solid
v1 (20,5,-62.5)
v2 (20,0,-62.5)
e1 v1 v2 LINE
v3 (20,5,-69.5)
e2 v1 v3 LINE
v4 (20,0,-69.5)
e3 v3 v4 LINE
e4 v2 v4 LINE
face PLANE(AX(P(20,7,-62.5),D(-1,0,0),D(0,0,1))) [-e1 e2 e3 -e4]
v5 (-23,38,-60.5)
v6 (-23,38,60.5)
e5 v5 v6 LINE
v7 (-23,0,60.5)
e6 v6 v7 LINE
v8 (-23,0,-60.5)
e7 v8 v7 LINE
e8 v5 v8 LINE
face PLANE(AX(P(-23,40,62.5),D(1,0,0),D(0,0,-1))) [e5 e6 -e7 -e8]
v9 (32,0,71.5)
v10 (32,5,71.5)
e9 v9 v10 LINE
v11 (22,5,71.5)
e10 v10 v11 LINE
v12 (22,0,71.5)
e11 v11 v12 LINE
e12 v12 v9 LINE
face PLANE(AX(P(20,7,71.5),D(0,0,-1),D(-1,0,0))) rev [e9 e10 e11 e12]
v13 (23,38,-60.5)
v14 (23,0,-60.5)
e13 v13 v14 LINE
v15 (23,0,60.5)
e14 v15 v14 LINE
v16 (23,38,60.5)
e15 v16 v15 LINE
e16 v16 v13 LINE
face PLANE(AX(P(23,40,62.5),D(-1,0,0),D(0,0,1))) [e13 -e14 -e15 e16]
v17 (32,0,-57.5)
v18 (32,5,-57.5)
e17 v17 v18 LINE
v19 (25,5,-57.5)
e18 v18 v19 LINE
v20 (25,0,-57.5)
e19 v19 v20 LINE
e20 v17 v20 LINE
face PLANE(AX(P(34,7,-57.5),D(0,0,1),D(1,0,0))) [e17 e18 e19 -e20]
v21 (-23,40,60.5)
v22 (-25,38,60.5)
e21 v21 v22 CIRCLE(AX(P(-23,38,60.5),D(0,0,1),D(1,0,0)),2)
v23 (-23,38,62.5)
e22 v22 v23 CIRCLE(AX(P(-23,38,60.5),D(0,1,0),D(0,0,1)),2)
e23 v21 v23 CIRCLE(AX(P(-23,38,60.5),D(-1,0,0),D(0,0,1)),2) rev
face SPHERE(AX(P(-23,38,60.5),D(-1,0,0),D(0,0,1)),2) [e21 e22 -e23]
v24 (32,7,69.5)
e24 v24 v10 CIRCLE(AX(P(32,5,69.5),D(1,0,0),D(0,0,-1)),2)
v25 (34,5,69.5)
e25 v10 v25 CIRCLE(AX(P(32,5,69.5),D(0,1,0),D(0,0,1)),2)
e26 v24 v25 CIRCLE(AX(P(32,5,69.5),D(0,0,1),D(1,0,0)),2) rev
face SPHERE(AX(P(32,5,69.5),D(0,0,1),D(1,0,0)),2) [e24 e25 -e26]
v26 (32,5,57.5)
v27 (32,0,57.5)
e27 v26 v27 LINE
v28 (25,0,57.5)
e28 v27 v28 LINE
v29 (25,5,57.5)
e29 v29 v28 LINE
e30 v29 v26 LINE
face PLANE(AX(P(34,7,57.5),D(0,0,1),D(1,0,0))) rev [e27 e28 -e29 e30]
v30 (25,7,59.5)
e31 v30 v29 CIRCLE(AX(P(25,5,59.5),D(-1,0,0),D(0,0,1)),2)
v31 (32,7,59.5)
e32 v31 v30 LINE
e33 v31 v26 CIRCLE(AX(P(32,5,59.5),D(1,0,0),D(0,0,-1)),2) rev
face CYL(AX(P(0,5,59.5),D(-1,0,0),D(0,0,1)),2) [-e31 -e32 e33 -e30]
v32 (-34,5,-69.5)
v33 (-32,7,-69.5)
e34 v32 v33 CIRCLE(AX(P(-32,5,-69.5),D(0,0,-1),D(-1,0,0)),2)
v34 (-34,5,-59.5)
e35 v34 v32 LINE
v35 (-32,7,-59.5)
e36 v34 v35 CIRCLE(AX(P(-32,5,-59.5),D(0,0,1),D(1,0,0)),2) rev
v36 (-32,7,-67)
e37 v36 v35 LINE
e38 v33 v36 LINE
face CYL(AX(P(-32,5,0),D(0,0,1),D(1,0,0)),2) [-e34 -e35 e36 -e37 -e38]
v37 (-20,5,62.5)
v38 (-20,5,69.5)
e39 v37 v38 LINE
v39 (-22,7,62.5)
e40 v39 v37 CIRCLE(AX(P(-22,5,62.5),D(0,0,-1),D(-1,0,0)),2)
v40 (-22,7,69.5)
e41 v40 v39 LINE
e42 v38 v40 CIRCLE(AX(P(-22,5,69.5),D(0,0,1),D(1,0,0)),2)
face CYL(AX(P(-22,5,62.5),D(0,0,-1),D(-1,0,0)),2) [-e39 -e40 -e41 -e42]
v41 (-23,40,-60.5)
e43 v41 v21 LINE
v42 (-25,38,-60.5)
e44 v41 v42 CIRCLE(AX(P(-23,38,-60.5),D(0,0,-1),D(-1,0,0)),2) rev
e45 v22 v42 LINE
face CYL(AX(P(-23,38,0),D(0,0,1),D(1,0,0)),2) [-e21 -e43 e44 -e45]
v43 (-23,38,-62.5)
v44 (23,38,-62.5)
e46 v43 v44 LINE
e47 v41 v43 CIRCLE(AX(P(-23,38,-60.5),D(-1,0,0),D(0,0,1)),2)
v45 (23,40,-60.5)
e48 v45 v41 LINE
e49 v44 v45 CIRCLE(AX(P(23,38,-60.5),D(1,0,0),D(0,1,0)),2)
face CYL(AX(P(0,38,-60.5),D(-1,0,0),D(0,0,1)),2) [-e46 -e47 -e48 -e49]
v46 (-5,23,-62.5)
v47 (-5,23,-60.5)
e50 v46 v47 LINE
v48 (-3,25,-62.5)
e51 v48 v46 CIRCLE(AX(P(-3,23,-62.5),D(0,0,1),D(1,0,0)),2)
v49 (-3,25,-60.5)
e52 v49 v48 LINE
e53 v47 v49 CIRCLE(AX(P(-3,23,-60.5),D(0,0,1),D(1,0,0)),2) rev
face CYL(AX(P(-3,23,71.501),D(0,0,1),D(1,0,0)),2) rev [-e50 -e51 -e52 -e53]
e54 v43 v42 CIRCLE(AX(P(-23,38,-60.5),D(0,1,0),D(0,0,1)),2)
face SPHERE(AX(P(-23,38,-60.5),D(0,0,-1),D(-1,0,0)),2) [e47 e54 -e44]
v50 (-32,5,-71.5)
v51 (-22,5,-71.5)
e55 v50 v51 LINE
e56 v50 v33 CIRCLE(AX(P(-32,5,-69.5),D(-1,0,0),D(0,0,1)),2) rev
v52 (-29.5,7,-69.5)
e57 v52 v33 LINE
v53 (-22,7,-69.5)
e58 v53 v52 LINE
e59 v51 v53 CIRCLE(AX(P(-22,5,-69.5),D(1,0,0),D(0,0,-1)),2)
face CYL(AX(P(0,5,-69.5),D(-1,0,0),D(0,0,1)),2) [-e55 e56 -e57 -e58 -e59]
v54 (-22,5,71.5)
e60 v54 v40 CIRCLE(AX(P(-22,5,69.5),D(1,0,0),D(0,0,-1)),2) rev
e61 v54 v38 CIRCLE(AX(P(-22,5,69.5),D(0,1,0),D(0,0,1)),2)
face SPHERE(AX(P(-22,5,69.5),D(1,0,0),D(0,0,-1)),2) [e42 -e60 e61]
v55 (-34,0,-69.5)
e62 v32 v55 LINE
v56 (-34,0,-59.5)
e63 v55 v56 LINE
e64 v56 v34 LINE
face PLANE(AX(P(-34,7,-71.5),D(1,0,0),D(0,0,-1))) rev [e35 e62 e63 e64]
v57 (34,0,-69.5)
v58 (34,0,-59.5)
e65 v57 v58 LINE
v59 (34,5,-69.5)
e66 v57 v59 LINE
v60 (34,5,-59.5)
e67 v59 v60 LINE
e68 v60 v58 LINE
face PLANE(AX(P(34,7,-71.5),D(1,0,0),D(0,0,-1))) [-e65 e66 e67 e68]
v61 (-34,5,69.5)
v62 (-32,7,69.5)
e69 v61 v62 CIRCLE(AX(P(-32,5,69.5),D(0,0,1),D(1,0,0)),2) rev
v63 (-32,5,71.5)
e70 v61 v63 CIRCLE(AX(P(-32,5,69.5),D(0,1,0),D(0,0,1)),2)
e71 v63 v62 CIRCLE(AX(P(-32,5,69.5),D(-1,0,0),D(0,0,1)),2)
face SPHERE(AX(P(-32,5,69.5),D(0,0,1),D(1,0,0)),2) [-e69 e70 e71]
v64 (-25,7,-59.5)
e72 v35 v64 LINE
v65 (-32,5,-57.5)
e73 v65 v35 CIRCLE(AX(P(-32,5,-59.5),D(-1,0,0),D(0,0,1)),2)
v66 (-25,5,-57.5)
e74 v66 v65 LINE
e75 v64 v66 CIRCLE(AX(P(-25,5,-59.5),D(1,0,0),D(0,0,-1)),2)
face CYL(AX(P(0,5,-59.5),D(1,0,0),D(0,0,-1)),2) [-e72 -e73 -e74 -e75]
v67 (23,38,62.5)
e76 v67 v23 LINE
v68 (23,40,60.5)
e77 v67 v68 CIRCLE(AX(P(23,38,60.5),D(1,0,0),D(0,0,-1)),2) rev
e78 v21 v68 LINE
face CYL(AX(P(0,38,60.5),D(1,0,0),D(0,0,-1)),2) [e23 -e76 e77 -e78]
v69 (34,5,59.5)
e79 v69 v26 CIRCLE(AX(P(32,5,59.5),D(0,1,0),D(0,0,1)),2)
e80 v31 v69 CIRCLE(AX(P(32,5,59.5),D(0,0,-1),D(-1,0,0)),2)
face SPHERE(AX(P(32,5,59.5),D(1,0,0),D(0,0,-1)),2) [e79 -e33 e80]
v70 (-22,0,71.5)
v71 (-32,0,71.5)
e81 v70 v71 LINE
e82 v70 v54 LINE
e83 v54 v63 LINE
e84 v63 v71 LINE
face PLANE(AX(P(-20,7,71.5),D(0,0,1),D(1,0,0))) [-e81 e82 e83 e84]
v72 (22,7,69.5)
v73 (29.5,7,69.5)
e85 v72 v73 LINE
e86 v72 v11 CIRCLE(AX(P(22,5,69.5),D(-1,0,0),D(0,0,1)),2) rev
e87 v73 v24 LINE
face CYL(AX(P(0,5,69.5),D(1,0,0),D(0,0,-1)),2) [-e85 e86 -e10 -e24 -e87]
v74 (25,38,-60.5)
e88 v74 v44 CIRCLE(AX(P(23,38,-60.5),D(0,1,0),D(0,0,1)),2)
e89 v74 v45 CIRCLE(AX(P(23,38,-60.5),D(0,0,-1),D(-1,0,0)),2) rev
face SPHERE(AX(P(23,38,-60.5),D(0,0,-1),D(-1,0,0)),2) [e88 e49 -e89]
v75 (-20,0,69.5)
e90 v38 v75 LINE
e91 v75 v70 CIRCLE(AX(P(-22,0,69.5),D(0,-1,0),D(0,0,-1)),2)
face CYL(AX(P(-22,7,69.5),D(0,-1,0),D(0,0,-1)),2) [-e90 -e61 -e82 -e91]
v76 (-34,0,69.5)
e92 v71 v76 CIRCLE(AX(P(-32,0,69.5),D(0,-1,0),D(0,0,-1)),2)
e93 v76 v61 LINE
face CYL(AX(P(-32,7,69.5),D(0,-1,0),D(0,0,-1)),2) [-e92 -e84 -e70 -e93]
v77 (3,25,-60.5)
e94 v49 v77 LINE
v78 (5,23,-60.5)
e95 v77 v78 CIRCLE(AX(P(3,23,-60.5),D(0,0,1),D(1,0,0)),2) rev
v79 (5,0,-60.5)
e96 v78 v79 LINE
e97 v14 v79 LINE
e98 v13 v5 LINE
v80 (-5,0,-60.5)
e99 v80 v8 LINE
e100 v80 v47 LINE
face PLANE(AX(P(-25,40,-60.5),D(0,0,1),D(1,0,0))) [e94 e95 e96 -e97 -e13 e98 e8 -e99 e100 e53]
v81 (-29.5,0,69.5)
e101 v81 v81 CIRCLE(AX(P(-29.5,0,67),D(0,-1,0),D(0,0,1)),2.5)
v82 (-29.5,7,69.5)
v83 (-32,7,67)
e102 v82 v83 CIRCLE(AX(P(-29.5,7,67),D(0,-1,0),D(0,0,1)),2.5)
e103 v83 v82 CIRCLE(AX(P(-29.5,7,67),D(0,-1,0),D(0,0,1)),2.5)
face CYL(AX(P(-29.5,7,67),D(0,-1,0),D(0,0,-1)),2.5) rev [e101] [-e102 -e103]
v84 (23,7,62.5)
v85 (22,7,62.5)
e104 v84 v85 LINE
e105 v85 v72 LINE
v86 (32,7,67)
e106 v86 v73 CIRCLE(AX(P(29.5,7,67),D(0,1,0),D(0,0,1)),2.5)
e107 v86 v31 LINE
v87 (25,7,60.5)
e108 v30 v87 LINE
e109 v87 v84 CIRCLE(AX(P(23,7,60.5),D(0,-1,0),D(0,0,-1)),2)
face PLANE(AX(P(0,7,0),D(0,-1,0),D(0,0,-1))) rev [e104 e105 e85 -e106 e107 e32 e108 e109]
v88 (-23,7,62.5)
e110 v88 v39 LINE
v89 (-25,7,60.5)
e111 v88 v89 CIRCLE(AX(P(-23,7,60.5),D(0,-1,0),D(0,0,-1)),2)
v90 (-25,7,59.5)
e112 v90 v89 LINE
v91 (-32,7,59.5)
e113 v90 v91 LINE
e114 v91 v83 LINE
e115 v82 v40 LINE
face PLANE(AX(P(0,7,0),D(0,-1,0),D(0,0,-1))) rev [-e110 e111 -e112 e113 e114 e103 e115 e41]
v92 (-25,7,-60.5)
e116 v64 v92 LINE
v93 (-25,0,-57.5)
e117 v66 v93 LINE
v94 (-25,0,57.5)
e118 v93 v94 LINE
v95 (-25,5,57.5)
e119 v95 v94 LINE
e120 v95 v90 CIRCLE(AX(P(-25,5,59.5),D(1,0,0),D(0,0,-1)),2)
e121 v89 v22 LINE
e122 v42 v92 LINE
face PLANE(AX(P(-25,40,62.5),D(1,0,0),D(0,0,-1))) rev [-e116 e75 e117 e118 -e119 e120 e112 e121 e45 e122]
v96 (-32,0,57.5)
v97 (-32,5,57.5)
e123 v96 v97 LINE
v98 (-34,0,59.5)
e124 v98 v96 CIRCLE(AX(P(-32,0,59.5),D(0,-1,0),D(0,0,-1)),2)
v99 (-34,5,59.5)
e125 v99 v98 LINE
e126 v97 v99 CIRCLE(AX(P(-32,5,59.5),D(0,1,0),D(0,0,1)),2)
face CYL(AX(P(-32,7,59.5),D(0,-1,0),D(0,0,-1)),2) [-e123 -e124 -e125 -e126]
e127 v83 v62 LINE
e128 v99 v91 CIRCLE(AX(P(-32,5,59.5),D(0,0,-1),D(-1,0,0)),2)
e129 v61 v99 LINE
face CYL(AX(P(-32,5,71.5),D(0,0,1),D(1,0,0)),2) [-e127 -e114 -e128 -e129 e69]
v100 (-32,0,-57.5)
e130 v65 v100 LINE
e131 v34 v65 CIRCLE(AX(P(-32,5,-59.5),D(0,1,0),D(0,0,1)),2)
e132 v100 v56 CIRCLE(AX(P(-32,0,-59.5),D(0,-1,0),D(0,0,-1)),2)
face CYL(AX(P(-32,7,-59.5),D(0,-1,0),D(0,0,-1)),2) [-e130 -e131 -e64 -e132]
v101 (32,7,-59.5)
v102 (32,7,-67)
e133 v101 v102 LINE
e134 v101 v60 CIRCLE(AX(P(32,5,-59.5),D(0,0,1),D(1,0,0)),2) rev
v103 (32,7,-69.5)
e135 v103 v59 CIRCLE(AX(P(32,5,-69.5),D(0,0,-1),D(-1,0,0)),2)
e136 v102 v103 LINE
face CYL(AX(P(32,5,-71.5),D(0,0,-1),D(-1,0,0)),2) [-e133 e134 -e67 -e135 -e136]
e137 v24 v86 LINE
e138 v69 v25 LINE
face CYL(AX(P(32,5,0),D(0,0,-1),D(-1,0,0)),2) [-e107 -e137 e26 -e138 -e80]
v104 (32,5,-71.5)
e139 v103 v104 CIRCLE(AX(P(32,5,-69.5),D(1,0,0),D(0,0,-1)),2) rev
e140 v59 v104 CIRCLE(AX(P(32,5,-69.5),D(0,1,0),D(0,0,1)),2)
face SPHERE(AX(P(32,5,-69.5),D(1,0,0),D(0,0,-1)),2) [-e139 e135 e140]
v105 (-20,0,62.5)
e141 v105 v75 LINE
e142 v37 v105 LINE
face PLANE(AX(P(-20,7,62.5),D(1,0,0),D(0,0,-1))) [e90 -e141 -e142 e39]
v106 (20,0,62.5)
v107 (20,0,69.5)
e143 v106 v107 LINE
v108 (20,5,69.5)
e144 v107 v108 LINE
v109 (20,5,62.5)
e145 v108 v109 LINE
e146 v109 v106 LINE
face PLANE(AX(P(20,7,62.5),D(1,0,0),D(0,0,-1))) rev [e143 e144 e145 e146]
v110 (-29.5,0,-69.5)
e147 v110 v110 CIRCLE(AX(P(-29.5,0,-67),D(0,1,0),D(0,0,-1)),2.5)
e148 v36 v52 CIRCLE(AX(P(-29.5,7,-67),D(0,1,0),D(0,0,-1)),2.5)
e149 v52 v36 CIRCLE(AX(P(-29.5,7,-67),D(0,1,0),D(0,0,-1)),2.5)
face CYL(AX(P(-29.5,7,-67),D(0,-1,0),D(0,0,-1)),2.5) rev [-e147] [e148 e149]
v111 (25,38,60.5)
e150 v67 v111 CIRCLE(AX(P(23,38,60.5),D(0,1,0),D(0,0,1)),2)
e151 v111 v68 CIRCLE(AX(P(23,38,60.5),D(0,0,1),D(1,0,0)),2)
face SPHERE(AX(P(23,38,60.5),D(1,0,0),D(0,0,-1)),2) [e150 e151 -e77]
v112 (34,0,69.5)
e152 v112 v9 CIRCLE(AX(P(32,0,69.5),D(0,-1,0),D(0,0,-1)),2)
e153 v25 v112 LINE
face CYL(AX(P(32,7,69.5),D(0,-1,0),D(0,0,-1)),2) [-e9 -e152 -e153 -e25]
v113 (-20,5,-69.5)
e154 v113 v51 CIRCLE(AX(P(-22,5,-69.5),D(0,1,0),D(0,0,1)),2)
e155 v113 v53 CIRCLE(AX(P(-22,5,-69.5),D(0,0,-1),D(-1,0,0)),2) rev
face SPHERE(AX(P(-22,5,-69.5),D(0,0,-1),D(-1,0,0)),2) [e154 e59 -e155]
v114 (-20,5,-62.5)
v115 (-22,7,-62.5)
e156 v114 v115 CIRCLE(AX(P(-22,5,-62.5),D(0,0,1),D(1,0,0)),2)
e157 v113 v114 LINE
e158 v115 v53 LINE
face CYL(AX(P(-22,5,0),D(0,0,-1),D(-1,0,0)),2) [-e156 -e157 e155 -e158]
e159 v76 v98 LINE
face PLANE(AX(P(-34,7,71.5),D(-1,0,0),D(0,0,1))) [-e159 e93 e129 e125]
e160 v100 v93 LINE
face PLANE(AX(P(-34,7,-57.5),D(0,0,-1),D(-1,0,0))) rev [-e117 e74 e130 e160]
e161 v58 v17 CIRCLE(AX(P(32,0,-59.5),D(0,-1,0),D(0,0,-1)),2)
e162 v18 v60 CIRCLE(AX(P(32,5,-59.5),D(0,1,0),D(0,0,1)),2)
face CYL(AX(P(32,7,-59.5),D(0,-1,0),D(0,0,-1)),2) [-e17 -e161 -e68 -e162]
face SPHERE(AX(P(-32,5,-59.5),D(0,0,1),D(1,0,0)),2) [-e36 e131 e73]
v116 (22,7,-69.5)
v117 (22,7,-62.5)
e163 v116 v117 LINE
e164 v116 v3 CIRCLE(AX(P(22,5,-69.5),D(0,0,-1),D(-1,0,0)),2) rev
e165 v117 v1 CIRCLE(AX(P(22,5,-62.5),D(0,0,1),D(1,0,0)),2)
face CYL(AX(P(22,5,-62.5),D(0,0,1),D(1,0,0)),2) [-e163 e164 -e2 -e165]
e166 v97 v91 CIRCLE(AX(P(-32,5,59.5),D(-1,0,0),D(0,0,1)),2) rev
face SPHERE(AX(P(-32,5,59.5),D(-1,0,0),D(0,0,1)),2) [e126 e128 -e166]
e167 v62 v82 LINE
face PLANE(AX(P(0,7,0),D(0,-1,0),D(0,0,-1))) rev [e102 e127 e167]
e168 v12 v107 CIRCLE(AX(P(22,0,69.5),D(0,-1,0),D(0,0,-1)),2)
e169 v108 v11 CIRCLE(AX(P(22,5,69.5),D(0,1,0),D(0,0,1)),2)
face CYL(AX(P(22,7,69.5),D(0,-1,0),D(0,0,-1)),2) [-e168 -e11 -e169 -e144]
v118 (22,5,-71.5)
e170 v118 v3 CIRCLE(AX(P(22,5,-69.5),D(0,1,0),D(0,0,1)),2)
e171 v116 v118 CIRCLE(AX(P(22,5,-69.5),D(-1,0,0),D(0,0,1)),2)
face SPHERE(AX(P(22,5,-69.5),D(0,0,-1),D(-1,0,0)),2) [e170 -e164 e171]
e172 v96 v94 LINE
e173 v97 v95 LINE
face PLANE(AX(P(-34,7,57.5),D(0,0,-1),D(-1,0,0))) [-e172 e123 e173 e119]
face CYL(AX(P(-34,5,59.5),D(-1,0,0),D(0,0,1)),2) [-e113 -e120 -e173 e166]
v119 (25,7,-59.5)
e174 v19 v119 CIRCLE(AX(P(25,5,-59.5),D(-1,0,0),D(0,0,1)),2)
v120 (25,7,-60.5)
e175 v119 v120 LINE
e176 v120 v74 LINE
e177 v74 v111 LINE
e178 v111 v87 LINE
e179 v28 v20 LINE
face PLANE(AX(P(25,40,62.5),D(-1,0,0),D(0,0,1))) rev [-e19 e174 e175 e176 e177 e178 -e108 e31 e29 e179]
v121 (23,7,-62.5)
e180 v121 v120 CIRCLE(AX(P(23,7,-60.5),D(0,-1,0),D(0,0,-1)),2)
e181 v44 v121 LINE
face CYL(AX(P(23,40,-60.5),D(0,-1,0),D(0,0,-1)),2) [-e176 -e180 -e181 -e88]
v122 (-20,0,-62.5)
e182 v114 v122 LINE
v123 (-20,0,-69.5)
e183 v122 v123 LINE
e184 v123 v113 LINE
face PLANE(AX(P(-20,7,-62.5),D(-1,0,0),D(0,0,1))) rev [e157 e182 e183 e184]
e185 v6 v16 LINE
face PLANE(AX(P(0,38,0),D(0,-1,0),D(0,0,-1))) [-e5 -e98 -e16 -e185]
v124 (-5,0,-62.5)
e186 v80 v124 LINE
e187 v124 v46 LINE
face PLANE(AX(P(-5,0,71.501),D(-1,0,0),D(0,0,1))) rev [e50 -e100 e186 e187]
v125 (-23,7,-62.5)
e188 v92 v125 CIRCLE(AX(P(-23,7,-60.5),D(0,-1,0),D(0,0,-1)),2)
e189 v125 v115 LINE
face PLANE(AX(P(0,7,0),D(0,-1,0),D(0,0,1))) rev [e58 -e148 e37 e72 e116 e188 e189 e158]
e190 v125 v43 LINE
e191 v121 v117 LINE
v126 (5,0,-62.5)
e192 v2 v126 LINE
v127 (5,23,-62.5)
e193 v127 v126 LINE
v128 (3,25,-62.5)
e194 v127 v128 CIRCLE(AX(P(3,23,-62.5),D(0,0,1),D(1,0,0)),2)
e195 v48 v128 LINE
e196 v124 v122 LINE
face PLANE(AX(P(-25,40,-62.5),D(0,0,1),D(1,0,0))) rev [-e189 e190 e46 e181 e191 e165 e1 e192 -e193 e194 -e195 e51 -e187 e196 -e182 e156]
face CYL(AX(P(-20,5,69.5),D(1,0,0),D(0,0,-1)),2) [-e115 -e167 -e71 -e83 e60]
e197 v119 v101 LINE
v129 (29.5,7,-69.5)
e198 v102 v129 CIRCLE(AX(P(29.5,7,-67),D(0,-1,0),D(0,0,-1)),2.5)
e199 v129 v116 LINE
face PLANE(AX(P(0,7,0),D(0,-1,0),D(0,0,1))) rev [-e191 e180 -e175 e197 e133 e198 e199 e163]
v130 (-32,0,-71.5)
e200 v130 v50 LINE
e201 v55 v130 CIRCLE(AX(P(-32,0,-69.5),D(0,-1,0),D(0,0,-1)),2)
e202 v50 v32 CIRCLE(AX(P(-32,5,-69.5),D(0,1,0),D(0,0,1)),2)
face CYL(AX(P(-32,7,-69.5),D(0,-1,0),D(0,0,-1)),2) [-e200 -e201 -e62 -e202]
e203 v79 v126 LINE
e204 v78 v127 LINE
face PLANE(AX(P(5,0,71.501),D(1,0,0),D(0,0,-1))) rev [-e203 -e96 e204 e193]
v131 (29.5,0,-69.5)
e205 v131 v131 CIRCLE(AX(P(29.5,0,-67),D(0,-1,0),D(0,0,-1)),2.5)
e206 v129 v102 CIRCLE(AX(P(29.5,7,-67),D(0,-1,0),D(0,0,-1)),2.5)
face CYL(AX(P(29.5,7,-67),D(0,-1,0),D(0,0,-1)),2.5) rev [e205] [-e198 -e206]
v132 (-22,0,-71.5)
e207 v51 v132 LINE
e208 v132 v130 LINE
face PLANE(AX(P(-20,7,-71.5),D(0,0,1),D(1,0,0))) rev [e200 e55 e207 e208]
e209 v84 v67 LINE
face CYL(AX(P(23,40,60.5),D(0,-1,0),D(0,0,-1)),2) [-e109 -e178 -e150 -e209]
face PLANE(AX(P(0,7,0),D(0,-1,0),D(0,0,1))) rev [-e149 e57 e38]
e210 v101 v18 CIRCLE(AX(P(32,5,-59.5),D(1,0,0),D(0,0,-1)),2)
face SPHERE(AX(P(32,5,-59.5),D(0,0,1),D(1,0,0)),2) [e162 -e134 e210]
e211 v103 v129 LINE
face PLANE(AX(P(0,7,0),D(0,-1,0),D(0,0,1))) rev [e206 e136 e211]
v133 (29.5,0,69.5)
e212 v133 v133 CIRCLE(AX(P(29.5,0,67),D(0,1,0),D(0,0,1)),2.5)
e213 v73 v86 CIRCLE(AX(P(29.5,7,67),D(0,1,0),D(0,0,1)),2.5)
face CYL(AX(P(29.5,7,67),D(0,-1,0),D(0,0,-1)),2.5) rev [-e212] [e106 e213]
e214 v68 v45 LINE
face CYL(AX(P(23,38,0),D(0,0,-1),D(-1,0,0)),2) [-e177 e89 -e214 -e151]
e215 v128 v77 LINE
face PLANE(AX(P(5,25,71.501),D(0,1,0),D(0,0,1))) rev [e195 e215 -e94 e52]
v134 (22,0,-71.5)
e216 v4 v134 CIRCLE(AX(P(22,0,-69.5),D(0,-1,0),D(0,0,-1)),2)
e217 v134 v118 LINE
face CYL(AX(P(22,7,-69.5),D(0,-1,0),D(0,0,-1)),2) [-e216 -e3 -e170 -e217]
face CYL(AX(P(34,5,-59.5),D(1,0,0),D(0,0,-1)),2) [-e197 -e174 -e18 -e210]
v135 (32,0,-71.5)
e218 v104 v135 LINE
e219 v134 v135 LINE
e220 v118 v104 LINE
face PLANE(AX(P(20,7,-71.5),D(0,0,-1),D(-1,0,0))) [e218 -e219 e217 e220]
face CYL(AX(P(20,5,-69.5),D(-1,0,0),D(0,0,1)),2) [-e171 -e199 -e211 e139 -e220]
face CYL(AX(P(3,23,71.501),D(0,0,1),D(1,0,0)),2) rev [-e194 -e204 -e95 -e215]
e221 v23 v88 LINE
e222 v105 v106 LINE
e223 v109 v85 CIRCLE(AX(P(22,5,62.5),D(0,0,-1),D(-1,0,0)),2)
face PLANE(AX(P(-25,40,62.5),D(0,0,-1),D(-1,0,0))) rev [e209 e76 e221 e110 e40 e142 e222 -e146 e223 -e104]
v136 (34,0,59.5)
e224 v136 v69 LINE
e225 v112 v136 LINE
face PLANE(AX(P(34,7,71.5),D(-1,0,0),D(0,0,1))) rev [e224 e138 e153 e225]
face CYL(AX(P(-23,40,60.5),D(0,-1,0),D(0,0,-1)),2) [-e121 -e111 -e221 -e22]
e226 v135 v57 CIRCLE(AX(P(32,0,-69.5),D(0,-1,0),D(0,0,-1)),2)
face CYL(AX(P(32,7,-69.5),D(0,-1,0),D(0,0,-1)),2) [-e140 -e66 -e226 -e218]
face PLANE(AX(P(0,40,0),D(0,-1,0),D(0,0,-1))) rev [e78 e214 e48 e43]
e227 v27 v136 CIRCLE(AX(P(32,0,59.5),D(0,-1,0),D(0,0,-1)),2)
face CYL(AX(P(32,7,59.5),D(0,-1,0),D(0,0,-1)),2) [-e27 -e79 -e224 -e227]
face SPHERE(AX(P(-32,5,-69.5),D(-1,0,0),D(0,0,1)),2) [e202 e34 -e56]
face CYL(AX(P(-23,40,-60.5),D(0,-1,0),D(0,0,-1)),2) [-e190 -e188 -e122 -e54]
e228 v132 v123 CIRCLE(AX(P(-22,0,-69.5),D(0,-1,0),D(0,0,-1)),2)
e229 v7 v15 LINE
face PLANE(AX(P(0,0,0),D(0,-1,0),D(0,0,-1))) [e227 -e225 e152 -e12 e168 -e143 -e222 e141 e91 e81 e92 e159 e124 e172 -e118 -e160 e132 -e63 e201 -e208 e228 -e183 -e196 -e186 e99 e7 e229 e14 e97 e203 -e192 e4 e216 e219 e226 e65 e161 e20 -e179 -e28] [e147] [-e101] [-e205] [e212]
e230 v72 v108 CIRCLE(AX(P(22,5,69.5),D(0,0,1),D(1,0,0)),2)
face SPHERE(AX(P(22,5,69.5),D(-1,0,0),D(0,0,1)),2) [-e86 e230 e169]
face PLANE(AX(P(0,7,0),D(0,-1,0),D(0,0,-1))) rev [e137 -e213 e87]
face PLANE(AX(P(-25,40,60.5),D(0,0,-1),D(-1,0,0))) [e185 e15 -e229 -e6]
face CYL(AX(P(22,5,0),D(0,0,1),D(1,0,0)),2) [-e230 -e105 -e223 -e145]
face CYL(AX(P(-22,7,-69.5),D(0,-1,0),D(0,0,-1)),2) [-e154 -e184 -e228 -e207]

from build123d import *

# Parameters (mm, degrees)
SKETCH1_W                                  = 50
SKETCH1_H                                  = 125
BOSS_EXTRUDE1_DEPTH                        = 40
SHELL2_T                                   = -2
SKETCH3_R                                  = 2.5
BOSS_EXTRUDE2_DEPTH                        = 7
MIRROR2_AT_THE_SECOND_PLANE_COPY_1_SKETC_R = 2.5
MIRROR2_AT_THE_SECOND_PLANE_COPY_1_DEPTH   = 7
CUT_EXTRUDE1_REACH                         = 145.917
SKETCH4_W                                  = 10
SKETCH4_H                                  = 25
FILLET2_R                                  = 2
FILLET3_R                                  = 2


with BuildPart() as part:
    # Sketch1 → Boss-Extrude1 (new body)
    with BuildSketch(Plane(origin=(0, 0, 0), x_dir=(1, 0, 0), z_dir=(0, 1, 0))):
        Rectangle(SKETCH1_W, SKETCH1_H)
    extrude(amount=BOSS_EXTRUDE1_DEPTH)

    # Shell2
    shell2_openings = [part.faces().sort_by_distance(p)[0] for p in [
        (0, 0, 0),
    ]]
    offset(amount=SHELL2_T, openings=shell2_openings, kind=Kind.INTERSECTION)

    # Sketch3 → Boss-Extrude2 (add)
    with BuildSketch(Plane(origin=(0, 0, 0), x_dir=(1, 0, 0), z_dir=(0, 1, 0))):
        Polygon((25, -62.5), (20, -62.5), (20, -71.5), (34, -71.5), (34, -57.5), (25, -57.5), align=None)
        with Locations(Location((29.5, -67, 0), (0, 0, 270))):
            Circle(SKETCH3_R, mode=Mode.SUBTRACT)
    boss_extrude2 = extrude(amount=BOSS_EXTRUDE2_DEPTH)

    # Mirror2: Boss-Extrude2 across plane
    add(boss_extrude2.mirror(Plane.XY))

    # Mirror2 at the second plane: Boss-Extrude2 across plane
    add(boss_extrude2.mirror(Plane(origin=(0, 0, 0), x_dir=(0, 0, 1), z_dir=(1, 0, 0))))

    # Mirror2 at the second plane copy 1 sketc → Mirror2 at the second plane copy 1 (add)
    with BuildSketch(Plane(origin=(0, 0, 0), x_dir=(-1, 0, 0), z_dir=(0, 1, 0))):
        Polygon((25, -62.5), (20, -62.5), (20, -71.5), (34, -71.5), (34, -57.5), (25, -57.5), align=None)
        with Locations(Location((29.5, -67, 0), (0, 0, 270))):
            Circle(MIRROR2_AT_THE_SECOND_PLANE_COPY_1_SKETC_R, mode=Mode.SUBTRACT)
    extrude(amount=MIRROR2_AT_THE_SECOND_PLANE_COPY_1_DEPTH)

    # Sketch4 → Cut-Extrude1 (cut, up to next)
    with BuildSketch(Plane(origin=(0, 0, -62.5), x_dir=(-1, 0, 0), z_dir=(0, 0, -1)), mode=Mode.PRIVATE) as cut_extrude1_sk1:
        with Locations((0, 12.5)):
            Rectangle(SKETCH4_W, SKETCH4_H)
    cut_extrude1_tool1 = extrude(cut_extrude1_sk1.sketch, amount=-CUT_EXTRUDE1_REACH, mode=Mode.PRIVATE) & part.part
    add(cut_extrude1_tool1.solids().sort_by_distance((0, 12.5, -62.5))[0], mode=Mode.SUBTRACT)

    # Fillet2
    fillet2_edges = [part.edges().sort_by_distance(p)[0] for p in [
        (-25, 40, 0),
        (0, 40, 62.5),
        (20, 7, 67),
        (27, 7, 71.5),
        (34, 7, 64.5),
        (29.5, 7, 57.5),
        (20, 3.5, 71.5),
        (34, 3.5, 71.5),
        (34, 3.5, 57.5),
        (-29.5, 7, 57.5),
        (-34, 7, 64.5),
        (-34, 3.5, 57.5),
        (25, 40, 0),
        (-27, 7, 71.5),
        (-34, 3.5, 71.5),
        (-20, 7, 67),
        (-20, 3.5, 71.5),
        (29.5, 7, -57.5),
        (34, 7, -64.5),
        (34, 3.5, -57.5),
        (27, 7, -71.5),
        (34, 3.5, -71.5),
        (20, 7, -67),
        (20, 3.5, -71.5),
        (25, 23.5, 62.5),
        (-25, 23.5, 62.5),
        (-25, 23.5, -62.5),
        (25, 23.5, -62.5),
        (-20, 7, -67),
        (-27, 7, -71.5),
        (-34, 7, -64.5),
        (-29.5, 7, -57.5),
        (-20, 3.5, -71.5),
        (-34, 3.5, -71.5),
        (-34, 3.5, -57.5),
        (0, 40, -62.5),
    ]]
    fillet(fillet2_edges, radius=FILLET2_R - 0.0001)  # a hair under: the kernel refuses the full size

    # Fillet3
    fillet3_edges = [part.edges().sort_by_distance(p)[0] for p in [
        (5, 25, -61.5),
        (-5, 25, -61.5),
    ]]
    fillet(fillet3_edges, radius=FILLET3_R)


solid = part.part
